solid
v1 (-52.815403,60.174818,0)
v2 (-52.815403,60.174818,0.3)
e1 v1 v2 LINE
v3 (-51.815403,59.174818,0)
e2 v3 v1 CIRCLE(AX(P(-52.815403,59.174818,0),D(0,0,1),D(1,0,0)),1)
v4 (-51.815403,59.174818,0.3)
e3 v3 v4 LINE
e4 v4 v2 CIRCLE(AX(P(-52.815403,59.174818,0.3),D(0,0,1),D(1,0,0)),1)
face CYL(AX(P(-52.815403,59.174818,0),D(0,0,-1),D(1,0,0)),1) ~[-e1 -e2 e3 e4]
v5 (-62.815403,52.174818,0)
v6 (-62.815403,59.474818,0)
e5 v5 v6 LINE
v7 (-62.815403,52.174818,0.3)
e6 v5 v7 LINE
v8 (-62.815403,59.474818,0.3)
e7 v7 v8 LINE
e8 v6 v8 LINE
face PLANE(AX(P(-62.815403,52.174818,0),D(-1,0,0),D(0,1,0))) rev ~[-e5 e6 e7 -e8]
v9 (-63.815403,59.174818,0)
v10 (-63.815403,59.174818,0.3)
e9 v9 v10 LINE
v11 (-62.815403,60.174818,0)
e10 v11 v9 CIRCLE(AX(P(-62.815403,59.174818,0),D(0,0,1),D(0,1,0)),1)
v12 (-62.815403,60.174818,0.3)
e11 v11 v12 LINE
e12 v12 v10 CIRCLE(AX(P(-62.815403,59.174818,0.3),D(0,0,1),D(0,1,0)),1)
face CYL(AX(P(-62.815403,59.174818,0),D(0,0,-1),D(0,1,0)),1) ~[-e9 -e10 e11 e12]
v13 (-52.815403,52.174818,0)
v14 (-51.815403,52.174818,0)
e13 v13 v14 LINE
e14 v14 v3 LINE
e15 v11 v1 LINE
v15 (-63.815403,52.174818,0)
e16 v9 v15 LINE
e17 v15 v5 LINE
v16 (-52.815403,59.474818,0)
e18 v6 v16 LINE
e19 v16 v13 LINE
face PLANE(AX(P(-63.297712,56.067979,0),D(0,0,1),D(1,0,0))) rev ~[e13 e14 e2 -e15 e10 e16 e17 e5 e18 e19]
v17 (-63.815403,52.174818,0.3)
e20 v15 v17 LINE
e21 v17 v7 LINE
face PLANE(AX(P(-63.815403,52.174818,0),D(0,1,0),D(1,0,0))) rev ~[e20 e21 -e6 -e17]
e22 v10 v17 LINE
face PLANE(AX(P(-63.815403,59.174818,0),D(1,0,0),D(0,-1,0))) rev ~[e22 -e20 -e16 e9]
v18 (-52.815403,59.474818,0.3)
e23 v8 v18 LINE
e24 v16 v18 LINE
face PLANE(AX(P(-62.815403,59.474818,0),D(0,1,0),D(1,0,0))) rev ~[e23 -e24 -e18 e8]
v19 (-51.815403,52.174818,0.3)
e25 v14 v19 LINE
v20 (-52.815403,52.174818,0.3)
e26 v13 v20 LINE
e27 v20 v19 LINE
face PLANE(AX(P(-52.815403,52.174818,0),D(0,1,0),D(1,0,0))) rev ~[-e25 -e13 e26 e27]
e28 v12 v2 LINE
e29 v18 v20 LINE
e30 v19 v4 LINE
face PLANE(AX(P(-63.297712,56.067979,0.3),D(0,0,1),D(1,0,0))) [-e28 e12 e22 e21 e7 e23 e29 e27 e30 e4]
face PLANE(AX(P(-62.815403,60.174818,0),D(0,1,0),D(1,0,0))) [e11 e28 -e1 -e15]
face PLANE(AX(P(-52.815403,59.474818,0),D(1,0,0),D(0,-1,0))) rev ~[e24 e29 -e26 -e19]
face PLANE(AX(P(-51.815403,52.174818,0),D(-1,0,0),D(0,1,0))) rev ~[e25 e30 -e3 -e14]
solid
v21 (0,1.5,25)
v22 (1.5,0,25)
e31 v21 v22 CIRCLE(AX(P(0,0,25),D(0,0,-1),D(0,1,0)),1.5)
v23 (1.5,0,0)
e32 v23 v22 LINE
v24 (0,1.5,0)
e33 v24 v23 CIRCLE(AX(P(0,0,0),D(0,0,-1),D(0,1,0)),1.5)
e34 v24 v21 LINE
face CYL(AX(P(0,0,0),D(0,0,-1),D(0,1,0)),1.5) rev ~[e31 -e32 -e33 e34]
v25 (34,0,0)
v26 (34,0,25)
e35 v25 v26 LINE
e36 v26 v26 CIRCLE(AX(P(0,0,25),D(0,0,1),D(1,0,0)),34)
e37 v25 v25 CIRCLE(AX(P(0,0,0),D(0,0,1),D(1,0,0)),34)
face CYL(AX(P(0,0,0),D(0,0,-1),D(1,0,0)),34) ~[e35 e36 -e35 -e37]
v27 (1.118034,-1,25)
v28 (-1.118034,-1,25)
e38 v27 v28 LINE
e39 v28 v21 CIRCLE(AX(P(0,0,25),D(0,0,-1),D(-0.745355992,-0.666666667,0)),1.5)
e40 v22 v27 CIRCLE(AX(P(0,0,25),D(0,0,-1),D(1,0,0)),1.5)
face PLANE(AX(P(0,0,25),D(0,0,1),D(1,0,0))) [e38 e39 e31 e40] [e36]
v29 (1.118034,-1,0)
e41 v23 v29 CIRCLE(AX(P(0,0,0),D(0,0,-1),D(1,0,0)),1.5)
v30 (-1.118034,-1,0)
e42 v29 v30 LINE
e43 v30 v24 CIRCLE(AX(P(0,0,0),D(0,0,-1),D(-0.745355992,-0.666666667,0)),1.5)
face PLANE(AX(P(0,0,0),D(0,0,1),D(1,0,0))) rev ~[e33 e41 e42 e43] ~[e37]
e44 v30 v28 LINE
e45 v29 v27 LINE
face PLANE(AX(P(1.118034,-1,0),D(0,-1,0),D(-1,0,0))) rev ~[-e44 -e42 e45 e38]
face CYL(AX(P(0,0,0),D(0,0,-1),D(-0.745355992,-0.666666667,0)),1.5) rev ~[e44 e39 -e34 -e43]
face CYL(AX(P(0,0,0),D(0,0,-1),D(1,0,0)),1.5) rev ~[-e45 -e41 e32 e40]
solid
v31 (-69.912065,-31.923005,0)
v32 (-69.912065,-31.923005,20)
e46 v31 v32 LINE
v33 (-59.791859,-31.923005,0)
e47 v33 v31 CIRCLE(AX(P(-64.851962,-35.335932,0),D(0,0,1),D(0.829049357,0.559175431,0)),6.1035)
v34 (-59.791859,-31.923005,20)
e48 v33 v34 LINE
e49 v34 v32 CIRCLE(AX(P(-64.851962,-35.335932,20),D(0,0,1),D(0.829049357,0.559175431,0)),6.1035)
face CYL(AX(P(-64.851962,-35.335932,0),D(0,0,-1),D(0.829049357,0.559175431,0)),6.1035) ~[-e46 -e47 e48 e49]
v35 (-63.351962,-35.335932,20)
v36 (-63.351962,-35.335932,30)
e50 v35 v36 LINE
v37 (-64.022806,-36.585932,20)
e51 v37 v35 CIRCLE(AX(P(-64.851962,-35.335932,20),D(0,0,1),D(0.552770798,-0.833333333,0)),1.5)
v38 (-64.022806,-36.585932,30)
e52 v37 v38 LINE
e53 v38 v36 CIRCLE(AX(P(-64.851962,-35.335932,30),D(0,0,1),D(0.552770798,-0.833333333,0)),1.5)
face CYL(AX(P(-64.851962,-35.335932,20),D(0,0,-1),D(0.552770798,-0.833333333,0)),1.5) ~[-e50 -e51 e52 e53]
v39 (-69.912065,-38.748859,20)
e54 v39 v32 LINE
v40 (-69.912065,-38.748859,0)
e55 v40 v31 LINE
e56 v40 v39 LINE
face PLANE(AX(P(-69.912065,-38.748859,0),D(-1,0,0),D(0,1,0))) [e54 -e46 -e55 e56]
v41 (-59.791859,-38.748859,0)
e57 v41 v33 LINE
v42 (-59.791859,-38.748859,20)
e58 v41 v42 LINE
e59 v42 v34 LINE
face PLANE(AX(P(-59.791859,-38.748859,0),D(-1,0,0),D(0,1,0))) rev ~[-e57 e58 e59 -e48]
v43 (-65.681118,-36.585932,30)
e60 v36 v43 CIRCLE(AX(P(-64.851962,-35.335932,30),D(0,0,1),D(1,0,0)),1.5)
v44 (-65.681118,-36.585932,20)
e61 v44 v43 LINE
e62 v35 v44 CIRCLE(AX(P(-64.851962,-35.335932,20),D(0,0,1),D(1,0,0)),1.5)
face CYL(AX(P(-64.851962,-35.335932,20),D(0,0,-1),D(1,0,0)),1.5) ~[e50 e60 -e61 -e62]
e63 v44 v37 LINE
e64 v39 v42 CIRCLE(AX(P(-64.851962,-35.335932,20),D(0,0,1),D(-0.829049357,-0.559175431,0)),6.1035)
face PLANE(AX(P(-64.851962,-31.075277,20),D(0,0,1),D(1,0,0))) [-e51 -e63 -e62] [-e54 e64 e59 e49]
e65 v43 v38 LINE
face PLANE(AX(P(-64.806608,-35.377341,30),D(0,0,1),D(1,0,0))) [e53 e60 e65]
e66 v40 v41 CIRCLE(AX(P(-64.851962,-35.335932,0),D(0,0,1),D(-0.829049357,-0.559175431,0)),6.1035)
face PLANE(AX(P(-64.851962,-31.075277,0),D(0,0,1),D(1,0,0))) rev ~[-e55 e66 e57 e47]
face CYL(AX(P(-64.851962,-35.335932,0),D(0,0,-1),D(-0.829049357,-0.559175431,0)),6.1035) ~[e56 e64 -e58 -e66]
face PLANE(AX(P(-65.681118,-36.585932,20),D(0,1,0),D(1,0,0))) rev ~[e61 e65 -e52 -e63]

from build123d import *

# Parameters (mm, degrees)
F0_R     = 34
F1_DEPTH = 25
F2_W     = 10.1202055069
F2_H     = 6.8258544885
F3_DEPTH = 20
F5_DEPTH = 10
F6_W     = 10
F6_H     = 0.7
F7_DEPTH = 0.3
F9_DEPTH = 8


with BuildPart() as f1:
    # F0 (on Top) → F1 (new body)
    with BuildSketch(Plane.XY):
        Circle(F0_R)
        with BuildLine():
            ThreePointArc((0, 1.5), (1.0606601718, 1.0606601718), (1.5, 0))
            ThreePointArc((1.5, 0), (1.4012585384, -0.5352331347), (1.1180339887, -1))
            ThreePointArc((1.1180339887, -1), (0, -1.5), (-1.1180339887, -1))
            ThreePointArc((-1.1180339887, -1), (-1.3693063938, 0.6123724357), (0, 1.5))
        make_face(mode=Mode.SUBTRACT)
        with BuildLine():
            ThreePointArc((-1.1180339887, -1), (0, -1.5), (1.1180339887, -1))
            Line((1.1180339887, -1), (0, -1))
            Line((0, -1), (-1.1180339887, -1))
        make_face()
    extrude(amount=F1_DEPTH)

    # F8 (on face) → F9 (cut)
    with BuildSketch(Plane.XZ.offset(-52.1748177707)):
        with BuildLine():
            ThreePointArc((-63.1654030268, 0.15), (-63.2093370096, 0.2560660172), (-63.3154030268, 0.3))
            Line((-63.3154030268, 0.3), (-63.3154030268, 0))
            ThreePointArc((-63.3154030268, 0), (-63.2093370096, 0.0439339828), (-63.1654030268, 0.15))
        make_face()
        with BuildLine():
            Line((-63.3154030268, 0), (-63.3154030268, 0.3))
            ThreePointArc((-63.3154030268, 0.3), (-63.4654030268, 0.15), (-63.3154030268, 0))
        make_face()
    extrude(amount=F9_DEPTH, mode=Mode.SUBTRACT)


with BuildPart() as f3:
    # F2 (on Top) → F3 (new body)
    with BuildSketch(Plane.XY):
        with BuildLine():
            Line((-69.9120647834, -31.9230046827), (-59.7918592765, -31.9230046827))
            ThreePointArc((-59.7918592765, -31.9230046827), (-64.8519620299, -29.232431927), (-69.9120647834, -31.9230046827))
        make_face()
        with Locations((-64.8519620299, -35.335931927)):
            Rectangle(F2_W, F2_H)
        with BuildLine():
            ThreePointArc((-69.9120647834, -38.7488591712), (-64.8519620299, -41.439431927), (-59.7918592765, -38.7488591712))
            Line((-59.7918592765, -38.7488591712), (-69.9120647834, -38.7488591712))
        make_face()
    extrude(amount=F3_DEPTH)

    # F4 (on face) → F5 (join)
    with BuildSketch(Plane.XY.offset(20)):
        with BuildLine():
            ThreePointArc((-64.0228058323, -36.585931927), (-63.5302710115, -36.0452505097), (-63.3519620299, -35.335931927))
            ThreePointArc((-63.3519620299, -35.335931927), (-65.5612806127, -34.0142409085), (-65.6811182275, -36.585931927))
            Line((-65.6811182275, -36.585931927), (-65.605327487, -36.585931927))
            Line((-65.605327487, -36.585931927), (-64.8519620299, -36.585931927))
            Line((-64.8519620299, -36.585931927), (-64.0228058323, -36.585931927))
        make_face()
    extrude(amount=F5_DEPTH)


with BuildPart() as f7:
    # F6 (on Top) → F7 (new body)
    with BuildSketch(Plane.XY):
        with BuildLine():
            Line((-62.8154030268, 59.4748177707), (-62.8154030268, 60.1748177707))
            ThreePointArc((-62.8154030268, 60.1748177707), (-63.5225098079, 59.8819245519), (-63.8154030268, 59.1748177707))
            Line((-63.8154030268, 59.1748177707), (-63.8154030268, 52.1748177707))
            Line((-63.8154030268, 52.1748177707), (-62.8154030268, 52.1748177707))
            Line((-62.8154030268, 52.1748177707), (-62.8154030268, 59.4748177707))
        make_face()
        with BuildLine():
            ThreePointArc((-51.8154030268, 59.1748177707), (-52.1082962456, 59.8819245519), (-52.8154030268, 60.1748177707))
            Line((-52.8154030268, 60.1748177707), (-52.8154030268, 59.4748177707))
            Line((-52.8154030268, 59.4748177707), (-52.8154030268, 52.1748177707))
            Line((-52.8154030268, 52.1748177707), (-51.8154030268, 52.1748177707))
            Line((-51.8154030268, 52.1748177707), (-51.8154030268, 59.1748177707))
        make_face()
        with Locations((-57.8154030268, 59.8248177707)):
            Rectangle(F6_W, F6_H)
    extrude(amount=F7_DEPTH)


solid = Compound([f1.part, f3.part, f7.part])
